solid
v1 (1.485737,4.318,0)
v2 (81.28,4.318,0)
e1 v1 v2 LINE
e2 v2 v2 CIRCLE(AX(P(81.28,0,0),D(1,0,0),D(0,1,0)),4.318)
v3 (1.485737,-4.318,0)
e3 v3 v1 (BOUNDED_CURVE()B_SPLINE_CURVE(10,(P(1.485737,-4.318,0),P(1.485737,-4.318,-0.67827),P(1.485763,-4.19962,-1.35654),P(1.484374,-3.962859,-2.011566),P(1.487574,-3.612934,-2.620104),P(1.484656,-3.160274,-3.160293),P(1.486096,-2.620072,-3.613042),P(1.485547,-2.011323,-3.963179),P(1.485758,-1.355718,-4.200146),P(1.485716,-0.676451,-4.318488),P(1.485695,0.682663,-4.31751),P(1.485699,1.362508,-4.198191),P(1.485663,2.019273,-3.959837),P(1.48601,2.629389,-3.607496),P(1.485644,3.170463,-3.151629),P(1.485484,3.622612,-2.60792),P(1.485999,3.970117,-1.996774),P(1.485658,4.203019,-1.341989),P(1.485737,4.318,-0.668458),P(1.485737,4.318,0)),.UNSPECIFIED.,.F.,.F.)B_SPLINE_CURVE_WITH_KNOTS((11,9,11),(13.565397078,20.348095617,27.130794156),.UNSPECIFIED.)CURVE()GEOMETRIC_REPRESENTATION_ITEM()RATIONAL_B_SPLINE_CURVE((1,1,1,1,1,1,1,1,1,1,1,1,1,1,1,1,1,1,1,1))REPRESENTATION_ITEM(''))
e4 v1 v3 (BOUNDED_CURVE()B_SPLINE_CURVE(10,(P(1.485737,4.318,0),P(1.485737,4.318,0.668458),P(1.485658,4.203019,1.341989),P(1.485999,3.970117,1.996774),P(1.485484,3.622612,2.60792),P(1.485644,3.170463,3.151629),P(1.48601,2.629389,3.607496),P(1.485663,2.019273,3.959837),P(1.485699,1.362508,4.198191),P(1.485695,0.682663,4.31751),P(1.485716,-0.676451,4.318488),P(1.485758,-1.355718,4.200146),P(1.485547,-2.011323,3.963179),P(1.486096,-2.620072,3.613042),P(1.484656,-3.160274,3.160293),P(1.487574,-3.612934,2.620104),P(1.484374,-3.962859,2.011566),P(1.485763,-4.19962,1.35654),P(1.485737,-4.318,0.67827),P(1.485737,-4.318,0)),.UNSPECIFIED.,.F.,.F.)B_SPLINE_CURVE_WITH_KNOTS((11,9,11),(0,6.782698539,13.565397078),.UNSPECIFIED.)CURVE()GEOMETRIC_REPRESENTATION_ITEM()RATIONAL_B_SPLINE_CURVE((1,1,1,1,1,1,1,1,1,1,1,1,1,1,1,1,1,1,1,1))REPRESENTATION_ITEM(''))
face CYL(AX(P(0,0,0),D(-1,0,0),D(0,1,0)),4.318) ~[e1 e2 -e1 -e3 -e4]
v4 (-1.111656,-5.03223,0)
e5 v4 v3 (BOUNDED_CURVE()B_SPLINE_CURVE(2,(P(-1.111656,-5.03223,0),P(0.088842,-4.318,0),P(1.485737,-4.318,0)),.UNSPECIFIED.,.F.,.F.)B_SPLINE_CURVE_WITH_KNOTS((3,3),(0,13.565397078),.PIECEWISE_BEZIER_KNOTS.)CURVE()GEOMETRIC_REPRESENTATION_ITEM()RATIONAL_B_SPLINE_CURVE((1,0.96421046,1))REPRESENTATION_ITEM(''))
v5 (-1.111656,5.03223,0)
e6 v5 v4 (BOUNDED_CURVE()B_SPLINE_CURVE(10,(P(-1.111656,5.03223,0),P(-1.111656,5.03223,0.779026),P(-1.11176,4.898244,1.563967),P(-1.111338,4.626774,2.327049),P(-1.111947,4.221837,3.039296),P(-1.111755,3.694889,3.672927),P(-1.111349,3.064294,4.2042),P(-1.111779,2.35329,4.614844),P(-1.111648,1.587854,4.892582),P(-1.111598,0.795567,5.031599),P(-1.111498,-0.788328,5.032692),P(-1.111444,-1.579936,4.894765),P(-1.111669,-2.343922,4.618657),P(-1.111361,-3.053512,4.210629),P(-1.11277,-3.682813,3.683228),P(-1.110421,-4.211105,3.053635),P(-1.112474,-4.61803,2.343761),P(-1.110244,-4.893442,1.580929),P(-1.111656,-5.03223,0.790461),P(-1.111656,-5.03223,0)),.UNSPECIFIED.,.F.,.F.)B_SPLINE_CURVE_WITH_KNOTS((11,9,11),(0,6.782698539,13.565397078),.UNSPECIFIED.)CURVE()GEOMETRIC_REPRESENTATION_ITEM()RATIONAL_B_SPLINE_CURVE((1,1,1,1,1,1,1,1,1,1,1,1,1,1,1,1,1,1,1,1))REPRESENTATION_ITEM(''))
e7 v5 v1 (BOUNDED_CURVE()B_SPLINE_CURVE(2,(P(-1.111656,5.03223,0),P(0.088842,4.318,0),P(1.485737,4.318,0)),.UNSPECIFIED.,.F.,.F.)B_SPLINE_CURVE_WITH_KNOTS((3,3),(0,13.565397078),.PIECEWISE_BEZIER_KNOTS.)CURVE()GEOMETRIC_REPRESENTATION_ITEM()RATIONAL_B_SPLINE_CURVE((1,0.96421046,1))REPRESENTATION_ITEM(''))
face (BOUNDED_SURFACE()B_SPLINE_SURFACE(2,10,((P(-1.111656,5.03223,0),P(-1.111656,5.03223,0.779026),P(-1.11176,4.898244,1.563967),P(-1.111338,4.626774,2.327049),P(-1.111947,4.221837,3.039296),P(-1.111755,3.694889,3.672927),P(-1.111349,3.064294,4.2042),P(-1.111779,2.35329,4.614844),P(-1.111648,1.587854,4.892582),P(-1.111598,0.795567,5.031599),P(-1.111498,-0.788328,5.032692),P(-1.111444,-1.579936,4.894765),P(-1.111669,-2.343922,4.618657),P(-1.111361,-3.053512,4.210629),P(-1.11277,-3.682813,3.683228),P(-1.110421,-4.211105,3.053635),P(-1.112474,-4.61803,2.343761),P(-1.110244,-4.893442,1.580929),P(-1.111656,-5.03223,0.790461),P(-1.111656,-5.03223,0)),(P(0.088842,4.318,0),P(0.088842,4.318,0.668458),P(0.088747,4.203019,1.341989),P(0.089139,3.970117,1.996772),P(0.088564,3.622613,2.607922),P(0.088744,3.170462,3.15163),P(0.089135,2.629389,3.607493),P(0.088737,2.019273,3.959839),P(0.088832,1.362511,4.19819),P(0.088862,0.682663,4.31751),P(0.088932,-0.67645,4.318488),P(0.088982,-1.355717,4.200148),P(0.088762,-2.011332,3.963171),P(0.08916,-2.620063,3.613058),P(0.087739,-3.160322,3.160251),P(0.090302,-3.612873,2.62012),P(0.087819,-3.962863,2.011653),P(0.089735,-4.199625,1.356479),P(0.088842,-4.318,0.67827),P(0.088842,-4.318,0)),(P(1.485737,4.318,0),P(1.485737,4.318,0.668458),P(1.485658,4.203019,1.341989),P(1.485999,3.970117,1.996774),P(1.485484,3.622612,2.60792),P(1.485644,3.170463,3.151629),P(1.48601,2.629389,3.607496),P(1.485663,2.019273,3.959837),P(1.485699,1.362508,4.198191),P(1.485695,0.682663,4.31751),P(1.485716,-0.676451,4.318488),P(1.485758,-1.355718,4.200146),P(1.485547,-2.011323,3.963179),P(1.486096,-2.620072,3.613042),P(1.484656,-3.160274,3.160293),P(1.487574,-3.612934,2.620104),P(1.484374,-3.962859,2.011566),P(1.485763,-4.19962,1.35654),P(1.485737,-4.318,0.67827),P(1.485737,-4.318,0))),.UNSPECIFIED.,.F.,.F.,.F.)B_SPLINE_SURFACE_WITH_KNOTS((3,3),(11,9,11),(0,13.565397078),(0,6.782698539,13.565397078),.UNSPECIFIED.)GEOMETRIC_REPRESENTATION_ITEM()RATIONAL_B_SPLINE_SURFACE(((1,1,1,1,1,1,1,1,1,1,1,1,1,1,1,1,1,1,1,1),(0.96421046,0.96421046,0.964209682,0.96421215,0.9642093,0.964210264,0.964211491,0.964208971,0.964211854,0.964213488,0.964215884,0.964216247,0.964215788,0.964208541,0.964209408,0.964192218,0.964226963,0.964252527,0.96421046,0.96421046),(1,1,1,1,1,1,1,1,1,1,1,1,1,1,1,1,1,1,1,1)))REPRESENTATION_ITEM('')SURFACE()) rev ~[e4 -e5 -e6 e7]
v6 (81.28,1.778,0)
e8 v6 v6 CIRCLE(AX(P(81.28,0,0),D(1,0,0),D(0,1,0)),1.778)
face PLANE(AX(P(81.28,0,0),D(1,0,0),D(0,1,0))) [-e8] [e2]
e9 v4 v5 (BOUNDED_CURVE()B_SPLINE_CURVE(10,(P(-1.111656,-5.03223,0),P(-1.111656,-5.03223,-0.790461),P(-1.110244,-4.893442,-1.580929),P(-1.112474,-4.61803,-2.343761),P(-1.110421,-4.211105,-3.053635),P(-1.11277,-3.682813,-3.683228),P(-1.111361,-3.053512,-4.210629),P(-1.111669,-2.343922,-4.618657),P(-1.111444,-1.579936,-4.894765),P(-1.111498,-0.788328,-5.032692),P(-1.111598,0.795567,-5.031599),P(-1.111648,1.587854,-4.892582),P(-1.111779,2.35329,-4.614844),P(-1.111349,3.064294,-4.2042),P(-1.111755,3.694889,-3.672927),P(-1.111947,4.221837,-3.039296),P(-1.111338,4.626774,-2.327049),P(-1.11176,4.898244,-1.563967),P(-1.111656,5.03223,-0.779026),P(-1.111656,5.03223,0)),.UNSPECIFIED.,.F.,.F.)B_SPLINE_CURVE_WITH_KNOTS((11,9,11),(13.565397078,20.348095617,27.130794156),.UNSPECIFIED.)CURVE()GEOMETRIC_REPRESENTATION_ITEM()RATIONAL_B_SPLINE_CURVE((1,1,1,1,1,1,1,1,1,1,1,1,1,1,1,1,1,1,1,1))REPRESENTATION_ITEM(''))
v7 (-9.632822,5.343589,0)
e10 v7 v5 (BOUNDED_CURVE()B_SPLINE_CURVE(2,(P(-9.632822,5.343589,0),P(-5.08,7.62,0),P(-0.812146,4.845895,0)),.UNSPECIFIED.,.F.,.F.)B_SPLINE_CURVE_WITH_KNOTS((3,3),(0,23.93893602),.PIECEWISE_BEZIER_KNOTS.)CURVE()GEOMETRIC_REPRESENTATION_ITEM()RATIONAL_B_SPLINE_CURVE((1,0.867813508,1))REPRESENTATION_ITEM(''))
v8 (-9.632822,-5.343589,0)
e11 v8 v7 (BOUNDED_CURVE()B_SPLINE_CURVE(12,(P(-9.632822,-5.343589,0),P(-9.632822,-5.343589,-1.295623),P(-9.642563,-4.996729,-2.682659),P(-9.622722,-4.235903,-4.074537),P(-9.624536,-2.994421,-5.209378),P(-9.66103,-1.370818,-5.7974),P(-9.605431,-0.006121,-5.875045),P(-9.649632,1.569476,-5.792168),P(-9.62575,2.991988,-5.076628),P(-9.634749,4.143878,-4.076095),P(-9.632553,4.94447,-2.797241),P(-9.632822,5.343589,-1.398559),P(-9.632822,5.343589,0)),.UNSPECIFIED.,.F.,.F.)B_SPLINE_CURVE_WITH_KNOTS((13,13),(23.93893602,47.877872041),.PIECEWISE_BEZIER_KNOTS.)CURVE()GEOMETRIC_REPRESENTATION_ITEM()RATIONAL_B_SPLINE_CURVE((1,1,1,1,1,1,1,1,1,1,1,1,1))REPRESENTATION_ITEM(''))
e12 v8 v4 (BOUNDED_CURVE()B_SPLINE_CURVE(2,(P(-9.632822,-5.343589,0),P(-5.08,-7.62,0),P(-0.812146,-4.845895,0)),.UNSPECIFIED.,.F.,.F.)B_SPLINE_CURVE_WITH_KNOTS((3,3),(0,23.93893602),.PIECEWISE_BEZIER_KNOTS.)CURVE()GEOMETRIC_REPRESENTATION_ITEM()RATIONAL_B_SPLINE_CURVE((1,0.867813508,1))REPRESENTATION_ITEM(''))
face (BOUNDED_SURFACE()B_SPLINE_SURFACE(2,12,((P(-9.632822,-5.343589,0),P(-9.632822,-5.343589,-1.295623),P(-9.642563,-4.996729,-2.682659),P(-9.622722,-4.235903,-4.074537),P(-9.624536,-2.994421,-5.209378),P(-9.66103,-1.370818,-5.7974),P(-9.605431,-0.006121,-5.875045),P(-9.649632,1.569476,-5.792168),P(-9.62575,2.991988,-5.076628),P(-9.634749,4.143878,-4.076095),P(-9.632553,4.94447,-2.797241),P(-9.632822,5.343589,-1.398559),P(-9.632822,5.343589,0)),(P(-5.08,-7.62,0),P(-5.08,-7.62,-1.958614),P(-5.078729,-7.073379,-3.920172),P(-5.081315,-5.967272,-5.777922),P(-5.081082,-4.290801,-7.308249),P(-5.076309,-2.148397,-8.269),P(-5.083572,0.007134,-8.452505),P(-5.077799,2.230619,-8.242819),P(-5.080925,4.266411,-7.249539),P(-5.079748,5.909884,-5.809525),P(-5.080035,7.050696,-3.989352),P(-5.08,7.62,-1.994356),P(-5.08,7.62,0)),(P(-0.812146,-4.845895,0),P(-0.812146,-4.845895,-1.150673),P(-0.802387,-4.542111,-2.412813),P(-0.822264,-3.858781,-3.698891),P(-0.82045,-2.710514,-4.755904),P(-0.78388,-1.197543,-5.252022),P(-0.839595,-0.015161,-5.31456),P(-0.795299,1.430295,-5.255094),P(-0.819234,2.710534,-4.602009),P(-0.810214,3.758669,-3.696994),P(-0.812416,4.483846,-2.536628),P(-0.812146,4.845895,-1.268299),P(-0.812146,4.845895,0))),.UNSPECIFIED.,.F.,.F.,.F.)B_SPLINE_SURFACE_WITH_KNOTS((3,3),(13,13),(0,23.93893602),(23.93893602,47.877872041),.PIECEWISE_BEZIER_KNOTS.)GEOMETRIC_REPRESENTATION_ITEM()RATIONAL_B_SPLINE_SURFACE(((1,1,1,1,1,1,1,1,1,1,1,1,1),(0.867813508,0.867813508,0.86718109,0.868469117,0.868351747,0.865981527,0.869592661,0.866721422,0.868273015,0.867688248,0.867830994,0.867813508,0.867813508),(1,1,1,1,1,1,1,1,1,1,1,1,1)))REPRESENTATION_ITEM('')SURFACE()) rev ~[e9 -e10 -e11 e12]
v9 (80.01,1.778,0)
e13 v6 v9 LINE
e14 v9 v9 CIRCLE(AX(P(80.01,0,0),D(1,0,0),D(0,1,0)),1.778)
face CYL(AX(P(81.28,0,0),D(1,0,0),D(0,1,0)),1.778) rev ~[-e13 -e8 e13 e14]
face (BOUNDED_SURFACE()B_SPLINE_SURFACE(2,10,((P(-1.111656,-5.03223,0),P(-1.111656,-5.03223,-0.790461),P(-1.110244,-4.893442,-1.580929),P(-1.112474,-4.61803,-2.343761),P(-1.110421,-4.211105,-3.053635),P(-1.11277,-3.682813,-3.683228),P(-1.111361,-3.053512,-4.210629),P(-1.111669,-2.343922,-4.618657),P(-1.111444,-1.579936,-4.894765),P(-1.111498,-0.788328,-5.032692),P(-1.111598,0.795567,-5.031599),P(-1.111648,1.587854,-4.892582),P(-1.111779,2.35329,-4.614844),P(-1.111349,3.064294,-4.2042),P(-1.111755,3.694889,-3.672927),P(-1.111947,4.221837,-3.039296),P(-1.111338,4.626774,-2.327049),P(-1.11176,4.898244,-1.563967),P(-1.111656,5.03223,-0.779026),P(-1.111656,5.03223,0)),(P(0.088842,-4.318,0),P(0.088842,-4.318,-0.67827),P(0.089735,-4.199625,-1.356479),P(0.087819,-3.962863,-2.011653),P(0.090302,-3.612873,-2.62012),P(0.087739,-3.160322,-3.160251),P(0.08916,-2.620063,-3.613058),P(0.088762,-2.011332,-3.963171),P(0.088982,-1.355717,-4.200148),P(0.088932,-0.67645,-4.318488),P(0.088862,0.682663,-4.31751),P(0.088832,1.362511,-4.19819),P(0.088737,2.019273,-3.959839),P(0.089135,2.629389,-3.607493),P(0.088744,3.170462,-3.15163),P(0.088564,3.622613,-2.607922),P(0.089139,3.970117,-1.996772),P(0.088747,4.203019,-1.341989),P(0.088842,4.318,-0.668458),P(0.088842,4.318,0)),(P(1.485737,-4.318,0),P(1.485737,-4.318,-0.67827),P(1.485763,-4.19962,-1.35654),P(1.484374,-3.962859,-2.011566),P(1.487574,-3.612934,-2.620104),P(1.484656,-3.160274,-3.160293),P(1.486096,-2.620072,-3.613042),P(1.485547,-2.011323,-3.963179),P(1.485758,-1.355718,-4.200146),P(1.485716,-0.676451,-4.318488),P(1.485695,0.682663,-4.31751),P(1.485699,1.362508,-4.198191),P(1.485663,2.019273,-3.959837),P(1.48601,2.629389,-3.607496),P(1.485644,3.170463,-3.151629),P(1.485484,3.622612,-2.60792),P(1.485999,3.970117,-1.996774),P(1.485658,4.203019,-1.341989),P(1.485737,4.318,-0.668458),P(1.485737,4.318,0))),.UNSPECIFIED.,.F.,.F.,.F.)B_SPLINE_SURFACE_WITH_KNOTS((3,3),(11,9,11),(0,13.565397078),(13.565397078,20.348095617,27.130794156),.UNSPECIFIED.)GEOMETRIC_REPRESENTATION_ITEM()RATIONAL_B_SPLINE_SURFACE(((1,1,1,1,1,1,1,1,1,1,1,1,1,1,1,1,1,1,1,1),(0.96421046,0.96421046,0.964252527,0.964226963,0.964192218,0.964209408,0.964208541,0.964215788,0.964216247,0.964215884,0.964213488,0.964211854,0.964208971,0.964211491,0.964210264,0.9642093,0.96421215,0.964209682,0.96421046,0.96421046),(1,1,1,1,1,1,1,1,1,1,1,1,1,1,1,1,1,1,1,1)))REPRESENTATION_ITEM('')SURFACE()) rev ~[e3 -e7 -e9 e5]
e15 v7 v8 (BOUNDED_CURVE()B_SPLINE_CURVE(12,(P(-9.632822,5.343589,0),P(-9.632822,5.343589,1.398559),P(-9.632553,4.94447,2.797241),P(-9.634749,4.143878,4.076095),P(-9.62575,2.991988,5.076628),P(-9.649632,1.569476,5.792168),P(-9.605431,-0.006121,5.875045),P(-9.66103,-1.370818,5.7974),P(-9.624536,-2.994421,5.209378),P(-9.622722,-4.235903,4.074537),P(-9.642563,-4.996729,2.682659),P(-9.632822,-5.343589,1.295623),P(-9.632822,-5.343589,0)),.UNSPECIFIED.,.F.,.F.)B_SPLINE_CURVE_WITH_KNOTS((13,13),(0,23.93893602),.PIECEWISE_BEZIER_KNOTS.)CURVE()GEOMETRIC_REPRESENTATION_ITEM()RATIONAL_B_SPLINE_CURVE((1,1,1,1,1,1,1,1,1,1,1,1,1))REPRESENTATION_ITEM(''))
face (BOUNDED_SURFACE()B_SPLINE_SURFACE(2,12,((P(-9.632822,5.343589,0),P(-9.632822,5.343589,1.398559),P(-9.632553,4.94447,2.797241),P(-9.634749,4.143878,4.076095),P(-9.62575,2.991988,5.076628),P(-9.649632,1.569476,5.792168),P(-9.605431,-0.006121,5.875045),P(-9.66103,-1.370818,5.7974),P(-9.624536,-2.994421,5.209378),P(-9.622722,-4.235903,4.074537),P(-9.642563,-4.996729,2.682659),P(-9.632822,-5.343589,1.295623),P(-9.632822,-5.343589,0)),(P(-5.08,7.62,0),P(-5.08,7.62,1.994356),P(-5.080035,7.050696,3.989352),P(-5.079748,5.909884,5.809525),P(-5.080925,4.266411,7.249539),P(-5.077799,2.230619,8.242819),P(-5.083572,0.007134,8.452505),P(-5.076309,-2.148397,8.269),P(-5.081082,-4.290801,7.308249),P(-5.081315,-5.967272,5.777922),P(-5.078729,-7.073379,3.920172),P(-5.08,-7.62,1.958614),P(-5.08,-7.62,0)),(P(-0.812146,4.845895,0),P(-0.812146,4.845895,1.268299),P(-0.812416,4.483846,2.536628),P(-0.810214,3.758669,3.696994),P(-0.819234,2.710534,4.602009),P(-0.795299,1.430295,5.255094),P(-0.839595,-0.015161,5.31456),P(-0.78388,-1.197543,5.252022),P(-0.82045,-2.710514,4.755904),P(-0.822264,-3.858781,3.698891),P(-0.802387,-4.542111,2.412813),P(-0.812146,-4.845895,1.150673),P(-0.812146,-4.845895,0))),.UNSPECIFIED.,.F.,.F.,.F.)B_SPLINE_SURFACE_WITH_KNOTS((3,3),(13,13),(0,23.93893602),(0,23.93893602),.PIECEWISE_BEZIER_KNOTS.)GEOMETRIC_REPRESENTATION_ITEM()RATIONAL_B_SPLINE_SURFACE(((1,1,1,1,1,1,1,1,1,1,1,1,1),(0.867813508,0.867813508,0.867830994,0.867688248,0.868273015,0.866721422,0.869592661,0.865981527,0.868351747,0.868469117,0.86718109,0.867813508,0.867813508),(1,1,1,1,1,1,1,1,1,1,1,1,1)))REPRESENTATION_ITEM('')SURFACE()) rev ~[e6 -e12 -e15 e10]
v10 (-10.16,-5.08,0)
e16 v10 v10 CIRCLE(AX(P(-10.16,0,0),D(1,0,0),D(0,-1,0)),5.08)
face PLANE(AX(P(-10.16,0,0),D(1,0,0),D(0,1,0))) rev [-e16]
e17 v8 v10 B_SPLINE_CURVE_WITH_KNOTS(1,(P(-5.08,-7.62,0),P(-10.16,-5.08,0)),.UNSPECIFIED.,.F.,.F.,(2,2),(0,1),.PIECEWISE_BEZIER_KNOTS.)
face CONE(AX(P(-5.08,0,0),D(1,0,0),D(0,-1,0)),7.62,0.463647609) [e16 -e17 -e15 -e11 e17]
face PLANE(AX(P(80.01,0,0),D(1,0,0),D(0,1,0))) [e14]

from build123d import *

# Parameters (mm, degrees)
F0_R      = 4.318
F1_DEPTH  = 81.28
F2_R      = 1.778
F3_DEPTH  = 1.27
F5_R      = 7.62
F6_FACE_R = 7.62
F8_R      = 5.08
F10_R     = 8.89
F11_R     = 5.08


with BuildPart() as f1:
    # F0 (on Right) → F1 (new body)
    with BuildSketch(Plane.YZ):
        Circle(F0_R)
    extrude(amount=F1_DEPTH)

    # F2 (on face) → F3 (cut)
    with BuildSketch(Plane.YZ.offset(81.28)):
        Circle(F2_R)
    extrude(amount=-F3_DEPTH, mode=Mode.SUBTRACT)

    # F0 (on Right) → F6 section 0
    with BuildSketch(Plane.YZ):
        Circle(F0_R)
    # F5 (on offset) → F6 section 1
    with BuildSketch(Plane.YZ.offset(-5.08)):
        Circle(F5_R)
    loft()

    # F6_face (on face) → F9 section 0
    with BuildSketch(Plane(origin=(-5.08, 0, 0), x_dir=(0, -1, 0), z_dir=(-1, 0, 0))):
        Circle(F6_FACE_R)
    # F8 (on offset) → F9 section 1
    with BuildSketch(Plane.YZ.offset(-10.16)):
        Circle(F8_R)
    loft()

    # F10
    f10_edges = [f1.edges().sort_by_distance(p)[0] for p in [
        (-5.08, 0, 7.62),
        (-5.08, 0, -7.62),
    ]]
    fillet(f10_edges, radius=F10_R)

    # F11
    f11_edges = [f1.edges().sort_by_distance(p)[0] for p in [
        (0, -4.318, 0),
    ]]
    fillet(f11_edges, radius=F11_R)


solid = f1.part
